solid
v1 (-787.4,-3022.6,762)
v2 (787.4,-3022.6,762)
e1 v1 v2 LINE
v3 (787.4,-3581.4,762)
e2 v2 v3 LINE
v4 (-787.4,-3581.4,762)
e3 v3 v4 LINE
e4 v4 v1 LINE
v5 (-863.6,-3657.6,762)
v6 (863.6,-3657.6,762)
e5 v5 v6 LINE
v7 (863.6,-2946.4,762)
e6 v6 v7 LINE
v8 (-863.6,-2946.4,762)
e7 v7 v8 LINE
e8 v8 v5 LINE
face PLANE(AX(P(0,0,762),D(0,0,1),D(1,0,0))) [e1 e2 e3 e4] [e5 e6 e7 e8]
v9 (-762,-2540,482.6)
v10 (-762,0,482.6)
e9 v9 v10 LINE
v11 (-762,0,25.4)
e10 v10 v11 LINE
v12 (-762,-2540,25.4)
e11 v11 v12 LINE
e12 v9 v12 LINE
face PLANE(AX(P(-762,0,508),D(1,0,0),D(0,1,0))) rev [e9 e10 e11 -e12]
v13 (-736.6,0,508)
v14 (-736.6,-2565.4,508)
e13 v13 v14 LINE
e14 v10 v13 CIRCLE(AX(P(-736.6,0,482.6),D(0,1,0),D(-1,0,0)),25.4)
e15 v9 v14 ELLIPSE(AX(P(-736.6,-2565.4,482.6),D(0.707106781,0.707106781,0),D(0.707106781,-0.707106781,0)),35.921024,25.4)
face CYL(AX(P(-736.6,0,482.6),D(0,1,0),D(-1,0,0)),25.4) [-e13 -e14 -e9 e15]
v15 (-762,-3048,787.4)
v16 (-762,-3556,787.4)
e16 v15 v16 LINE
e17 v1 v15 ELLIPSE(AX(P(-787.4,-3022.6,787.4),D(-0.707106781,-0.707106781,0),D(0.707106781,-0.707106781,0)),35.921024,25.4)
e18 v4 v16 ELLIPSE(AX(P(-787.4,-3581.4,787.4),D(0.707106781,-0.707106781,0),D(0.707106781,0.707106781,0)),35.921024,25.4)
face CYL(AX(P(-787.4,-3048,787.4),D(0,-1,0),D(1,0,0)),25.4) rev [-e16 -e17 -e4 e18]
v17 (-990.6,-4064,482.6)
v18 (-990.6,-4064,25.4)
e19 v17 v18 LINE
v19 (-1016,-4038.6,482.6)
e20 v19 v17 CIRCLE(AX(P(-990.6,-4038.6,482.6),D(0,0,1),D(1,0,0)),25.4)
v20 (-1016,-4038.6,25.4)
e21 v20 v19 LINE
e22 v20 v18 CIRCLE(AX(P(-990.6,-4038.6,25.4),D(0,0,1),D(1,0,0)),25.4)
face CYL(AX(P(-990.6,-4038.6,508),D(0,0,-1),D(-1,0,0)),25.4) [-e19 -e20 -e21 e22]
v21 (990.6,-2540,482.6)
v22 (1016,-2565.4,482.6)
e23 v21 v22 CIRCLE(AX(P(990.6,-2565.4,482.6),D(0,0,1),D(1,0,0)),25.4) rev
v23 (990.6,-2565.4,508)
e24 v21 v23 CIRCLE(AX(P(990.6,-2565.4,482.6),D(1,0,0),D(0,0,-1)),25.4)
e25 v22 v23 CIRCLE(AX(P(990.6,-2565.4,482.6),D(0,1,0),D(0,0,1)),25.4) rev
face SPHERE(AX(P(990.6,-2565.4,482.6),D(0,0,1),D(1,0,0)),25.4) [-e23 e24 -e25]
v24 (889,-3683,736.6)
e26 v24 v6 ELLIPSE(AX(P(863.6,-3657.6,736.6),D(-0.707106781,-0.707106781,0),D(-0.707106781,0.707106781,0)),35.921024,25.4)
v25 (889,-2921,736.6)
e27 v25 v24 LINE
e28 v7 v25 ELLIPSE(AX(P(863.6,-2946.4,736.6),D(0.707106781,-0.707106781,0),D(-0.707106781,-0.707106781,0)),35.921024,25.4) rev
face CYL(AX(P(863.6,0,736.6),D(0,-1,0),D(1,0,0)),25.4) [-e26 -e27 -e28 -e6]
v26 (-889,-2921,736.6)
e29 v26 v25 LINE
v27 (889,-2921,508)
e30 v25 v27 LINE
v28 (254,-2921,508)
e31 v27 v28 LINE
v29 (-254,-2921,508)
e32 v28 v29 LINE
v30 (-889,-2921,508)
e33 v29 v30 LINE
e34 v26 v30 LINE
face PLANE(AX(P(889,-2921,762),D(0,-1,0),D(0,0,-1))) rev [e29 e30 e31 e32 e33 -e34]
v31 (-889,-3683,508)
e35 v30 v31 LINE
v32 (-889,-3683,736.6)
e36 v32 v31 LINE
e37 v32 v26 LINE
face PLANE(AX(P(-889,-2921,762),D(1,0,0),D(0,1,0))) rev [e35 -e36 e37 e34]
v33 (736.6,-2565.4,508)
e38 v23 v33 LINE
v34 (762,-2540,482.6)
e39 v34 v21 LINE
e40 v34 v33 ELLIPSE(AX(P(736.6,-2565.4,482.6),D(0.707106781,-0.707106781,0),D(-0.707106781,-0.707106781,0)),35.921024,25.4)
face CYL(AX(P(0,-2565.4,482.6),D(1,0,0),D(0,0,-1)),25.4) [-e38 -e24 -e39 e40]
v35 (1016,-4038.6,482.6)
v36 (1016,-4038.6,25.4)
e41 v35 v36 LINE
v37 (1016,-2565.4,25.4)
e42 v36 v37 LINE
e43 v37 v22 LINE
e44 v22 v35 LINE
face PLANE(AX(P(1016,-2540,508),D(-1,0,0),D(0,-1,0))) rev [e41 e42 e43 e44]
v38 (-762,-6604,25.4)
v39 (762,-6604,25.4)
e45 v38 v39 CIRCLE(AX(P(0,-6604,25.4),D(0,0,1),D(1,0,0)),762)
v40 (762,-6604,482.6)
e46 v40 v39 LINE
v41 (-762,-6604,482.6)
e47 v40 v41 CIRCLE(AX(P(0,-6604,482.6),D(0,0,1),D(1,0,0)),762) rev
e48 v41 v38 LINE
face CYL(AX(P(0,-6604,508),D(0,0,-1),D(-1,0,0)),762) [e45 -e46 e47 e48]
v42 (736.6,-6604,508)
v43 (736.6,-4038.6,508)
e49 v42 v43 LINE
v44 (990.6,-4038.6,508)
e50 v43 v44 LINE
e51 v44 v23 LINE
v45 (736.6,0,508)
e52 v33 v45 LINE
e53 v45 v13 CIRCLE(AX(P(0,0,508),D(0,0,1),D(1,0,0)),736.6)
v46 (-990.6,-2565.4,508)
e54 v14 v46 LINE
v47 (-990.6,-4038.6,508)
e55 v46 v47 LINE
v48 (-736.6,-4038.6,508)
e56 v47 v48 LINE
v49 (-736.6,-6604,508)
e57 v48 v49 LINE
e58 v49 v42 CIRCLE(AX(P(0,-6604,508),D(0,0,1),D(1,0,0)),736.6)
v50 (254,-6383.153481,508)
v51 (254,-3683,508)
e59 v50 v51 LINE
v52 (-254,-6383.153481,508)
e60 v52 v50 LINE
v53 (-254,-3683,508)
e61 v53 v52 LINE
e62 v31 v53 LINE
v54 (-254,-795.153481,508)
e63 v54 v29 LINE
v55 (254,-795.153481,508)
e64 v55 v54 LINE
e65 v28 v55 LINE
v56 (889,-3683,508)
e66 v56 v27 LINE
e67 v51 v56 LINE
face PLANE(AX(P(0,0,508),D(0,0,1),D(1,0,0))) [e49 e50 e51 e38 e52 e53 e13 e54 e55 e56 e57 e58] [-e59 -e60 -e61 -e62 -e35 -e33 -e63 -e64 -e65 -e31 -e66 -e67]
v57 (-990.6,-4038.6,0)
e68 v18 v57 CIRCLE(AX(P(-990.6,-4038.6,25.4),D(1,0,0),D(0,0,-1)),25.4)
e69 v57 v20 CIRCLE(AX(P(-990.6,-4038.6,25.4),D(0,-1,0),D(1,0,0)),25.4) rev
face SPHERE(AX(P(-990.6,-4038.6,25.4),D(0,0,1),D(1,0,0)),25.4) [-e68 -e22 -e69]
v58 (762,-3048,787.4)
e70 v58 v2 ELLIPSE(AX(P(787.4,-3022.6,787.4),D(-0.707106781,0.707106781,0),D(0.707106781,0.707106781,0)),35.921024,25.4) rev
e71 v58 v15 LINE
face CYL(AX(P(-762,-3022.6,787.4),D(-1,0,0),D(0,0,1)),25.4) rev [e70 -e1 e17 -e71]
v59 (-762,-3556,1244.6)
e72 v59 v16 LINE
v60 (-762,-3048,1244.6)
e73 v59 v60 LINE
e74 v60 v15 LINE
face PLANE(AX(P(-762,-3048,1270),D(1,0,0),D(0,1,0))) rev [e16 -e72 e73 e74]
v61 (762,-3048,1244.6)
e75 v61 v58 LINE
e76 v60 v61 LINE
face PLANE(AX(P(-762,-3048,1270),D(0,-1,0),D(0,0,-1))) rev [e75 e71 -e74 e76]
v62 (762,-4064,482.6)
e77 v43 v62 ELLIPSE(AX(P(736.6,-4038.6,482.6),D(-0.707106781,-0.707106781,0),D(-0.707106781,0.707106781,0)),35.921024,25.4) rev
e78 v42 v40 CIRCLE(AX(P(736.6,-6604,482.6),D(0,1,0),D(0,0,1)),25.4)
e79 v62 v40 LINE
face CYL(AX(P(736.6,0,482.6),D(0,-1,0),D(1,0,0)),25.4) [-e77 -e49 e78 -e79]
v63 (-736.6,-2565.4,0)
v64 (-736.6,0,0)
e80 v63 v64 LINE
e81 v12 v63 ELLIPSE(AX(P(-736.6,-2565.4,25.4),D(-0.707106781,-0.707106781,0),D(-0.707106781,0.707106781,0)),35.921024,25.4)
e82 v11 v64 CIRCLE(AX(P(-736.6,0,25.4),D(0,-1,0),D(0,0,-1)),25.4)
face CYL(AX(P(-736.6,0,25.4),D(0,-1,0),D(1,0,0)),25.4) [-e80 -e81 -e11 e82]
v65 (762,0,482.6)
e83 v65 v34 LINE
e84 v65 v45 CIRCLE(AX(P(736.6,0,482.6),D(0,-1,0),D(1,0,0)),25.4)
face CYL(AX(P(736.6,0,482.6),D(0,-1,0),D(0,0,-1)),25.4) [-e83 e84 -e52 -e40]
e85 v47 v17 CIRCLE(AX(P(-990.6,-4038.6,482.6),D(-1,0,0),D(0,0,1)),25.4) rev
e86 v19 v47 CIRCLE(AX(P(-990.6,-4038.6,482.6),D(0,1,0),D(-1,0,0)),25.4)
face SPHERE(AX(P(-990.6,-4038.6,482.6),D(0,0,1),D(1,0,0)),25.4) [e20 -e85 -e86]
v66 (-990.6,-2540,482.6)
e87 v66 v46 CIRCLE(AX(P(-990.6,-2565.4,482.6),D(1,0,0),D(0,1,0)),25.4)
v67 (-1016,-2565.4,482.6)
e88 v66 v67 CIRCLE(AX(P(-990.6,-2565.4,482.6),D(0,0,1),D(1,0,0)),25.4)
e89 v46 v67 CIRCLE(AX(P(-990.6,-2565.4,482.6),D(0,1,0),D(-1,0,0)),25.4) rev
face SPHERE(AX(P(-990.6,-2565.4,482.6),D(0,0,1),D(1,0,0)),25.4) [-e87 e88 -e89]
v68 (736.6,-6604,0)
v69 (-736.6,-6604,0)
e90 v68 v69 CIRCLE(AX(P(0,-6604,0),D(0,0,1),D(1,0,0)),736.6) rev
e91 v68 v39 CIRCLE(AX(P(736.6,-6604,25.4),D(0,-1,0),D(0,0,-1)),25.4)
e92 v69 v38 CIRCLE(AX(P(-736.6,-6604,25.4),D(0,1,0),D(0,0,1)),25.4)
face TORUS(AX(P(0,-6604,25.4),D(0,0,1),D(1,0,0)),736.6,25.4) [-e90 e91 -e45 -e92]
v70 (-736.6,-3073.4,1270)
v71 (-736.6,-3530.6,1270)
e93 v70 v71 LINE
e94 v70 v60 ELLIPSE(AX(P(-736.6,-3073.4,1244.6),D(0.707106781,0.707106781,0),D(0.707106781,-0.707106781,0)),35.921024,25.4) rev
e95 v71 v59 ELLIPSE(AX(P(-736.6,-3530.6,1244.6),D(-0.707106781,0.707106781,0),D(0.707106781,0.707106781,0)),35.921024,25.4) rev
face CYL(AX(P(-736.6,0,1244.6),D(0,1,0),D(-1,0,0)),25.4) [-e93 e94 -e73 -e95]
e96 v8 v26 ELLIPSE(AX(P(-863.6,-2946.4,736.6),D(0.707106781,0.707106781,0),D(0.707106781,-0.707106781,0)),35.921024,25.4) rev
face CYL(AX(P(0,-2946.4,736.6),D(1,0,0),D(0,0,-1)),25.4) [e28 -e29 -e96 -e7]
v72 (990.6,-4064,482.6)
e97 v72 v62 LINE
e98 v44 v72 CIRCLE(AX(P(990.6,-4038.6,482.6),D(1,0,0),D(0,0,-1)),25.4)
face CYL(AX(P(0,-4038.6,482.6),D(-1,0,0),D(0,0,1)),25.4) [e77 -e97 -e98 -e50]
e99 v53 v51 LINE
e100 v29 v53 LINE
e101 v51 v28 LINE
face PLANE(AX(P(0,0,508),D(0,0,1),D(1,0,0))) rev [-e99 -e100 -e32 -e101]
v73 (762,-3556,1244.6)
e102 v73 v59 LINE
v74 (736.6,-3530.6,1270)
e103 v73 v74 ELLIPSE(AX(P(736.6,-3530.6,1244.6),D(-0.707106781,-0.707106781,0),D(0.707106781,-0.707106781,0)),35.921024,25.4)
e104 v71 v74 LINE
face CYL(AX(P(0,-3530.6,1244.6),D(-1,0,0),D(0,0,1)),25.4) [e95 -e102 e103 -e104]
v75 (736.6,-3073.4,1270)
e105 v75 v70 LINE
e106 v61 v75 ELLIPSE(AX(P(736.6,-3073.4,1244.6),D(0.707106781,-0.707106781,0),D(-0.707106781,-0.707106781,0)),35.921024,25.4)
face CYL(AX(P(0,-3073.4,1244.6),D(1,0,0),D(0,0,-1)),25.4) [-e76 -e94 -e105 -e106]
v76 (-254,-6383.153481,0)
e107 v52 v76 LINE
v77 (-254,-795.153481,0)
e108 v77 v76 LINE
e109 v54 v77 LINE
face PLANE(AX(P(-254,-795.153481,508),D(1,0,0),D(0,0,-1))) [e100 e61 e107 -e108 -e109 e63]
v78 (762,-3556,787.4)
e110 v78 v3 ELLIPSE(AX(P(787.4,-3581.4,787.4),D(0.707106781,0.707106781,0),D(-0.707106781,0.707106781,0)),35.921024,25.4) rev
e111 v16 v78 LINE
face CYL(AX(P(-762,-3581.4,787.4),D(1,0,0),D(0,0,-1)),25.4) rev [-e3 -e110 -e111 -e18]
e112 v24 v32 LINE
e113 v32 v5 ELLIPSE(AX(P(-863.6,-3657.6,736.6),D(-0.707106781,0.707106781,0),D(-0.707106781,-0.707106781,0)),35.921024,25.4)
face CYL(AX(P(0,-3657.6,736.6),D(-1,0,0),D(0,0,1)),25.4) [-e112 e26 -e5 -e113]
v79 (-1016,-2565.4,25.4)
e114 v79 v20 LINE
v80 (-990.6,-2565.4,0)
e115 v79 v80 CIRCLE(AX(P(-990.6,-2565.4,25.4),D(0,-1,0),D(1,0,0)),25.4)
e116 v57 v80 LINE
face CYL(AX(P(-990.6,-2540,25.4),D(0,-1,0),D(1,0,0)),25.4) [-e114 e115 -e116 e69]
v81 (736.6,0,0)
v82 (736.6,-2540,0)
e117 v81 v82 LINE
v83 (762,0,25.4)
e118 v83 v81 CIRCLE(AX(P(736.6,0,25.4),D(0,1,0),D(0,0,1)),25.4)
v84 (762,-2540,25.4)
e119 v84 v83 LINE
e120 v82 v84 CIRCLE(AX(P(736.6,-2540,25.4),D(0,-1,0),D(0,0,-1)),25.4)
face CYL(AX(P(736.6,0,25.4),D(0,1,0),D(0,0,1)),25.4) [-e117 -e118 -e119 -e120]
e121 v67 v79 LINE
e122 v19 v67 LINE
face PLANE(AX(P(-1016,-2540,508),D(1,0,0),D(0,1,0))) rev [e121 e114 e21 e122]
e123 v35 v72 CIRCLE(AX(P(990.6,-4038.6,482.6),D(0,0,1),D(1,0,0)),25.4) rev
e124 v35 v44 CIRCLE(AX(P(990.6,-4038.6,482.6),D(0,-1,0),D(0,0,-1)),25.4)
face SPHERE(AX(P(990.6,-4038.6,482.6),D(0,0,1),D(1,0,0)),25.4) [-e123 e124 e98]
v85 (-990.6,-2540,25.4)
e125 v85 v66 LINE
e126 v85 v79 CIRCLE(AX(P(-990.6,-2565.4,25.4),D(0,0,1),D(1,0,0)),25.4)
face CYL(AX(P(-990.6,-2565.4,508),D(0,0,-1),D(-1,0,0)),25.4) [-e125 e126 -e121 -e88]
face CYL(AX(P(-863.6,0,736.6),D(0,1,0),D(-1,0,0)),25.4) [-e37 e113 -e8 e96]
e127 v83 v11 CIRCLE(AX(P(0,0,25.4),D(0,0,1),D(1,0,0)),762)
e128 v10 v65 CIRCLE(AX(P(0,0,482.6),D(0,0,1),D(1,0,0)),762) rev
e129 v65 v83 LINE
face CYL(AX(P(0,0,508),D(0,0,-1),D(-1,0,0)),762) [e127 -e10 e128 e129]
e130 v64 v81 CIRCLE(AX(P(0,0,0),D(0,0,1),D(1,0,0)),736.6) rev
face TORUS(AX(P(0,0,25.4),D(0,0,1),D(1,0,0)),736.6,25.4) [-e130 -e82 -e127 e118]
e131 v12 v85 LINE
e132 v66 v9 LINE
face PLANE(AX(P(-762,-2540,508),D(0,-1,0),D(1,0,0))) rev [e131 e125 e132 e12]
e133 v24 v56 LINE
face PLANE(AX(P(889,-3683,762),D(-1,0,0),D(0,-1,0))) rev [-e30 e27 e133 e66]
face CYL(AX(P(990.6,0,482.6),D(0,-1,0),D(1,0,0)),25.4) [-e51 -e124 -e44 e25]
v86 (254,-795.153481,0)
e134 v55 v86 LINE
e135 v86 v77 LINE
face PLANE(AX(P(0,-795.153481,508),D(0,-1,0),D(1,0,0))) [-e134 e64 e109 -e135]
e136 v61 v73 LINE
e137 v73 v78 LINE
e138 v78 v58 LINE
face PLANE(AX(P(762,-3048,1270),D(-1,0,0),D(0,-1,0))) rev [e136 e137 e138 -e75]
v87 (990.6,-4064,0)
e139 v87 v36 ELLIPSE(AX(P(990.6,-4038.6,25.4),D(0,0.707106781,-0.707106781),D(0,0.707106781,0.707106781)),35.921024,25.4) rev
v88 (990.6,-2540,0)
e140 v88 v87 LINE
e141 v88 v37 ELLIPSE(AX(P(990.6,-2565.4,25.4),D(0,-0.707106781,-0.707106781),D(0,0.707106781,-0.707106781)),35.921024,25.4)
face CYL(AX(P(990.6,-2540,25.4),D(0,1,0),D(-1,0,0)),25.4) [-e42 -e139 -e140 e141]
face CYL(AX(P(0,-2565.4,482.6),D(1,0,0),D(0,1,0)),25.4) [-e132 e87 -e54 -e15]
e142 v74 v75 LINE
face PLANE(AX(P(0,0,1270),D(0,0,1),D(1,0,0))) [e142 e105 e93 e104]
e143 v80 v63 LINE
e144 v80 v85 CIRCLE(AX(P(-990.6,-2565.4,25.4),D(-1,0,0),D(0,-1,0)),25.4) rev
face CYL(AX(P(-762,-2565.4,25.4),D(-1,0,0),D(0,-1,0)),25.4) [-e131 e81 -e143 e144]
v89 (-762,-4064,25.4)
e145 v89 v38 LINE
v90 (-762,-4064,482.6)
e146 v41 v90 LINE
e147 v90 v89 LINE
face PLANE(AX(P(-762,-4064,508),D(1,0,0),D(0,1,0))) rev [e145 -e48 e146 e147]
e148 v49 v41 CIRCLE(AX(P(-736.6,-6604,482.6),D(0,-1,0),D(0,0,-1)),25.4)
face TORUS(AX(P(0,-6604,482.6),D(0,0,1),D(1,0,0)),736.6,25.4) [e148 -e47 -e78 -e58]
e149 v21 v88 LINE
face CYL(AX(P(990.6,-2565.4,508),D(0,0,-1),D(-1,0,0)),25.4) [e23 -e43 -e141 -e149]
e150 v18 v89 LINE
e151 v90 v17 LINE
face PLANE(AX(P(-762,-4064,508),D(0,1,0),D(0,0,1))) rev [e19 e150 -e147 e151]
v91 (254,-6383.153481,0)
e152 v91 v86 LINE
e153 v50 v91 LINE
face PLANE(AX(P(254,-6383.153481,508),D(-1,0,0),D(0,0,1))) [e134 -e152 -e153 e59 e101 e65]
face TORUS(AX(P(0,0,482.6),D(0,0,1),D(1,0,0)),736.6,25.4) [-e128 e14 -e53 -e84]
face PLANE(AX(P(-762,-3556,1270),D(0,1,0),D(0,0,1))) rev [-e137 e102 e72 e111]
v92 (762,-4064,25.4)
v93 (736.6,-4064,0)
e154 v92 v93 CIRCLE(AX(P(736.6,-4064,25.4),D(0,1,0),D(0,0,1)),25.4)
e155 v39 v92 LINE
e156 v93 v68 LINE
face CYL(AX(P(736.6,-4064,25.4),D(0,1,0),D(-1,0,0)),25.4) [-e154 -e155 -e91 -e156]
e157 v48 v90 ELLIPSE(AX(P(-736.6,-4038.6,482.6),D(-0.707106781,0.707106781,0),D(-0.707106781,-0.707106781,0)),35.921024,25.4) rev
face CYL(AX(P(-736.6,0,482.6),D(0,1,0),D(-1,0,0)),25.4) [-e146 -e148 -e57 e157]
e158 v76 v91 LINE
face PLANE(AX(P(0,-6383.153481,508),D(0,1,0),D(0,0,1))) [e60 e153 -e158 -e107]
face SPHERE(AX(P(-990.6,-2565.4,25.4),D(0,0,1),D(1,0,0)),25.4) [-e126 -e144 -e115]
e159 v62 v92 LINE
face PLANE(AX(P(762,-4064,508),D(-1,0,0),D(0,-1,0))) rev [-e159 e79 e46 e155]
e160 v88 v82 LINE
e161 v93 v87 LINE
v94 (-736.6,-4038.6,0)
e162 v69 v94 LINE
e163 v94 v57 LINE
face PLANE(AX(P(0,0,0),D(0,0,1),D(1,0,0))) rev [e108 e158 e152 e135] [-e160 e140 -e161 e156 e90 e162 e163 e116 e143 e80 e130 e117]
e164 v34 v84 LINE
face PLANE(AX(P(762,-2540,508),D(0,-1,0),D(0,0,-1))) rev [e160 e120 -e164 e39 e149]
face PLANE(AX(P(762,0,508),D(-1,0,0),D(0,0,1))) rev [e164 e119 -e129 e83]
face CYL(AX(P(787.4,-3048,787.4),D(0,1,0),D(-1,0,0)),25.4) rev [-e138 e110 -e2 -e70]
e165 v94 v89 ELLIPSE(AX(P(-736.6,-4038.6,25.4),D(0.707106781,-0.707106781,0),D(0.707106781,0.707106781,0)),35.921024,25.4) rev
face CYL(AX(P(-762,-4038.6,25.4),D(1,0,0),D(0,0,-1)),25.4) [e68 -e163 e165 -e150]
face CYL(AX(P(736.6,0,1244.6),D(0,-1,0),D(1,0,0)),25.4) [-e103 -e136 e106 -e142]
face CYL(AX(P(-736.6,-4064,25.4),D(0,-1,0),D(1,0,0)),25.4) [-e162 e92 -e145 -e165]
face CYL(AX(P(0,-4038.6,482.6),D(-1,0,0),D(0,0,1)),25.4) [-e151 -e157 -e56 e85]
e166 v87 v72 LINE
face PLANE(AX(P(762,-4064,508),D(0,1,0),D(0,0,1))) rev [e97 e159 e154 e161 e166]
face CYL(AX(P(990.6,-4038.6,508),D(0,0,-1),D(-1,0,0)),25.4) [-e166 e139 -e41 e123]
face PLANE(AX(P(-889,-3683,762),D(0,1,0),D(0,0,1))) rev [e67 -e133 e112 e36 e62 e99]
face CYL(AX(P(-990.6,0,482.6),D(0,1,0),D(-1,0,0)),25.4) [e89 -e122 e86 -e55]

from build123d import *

# Parameters (mm, degrees)
BOSS_EXTRUDE1_DEPTH = 508
SKETCH2_W           = 1524
SKETCH2_H           = 508
BOSS_EXTRUDE3_DEPTH = 762
SKETCH3_W           = 1778
SKETCH3_H           = 762
SKETCH3_W_2         = 1524
SKETCH3_H_2         = 508
BOSS_EXTRUDE4_DEPTH = 254
FILLET1_R           = 25.4
FILLET2_R           = 25.4
FILLET3_R           = 25.4


with BuildPart() as part:
    # Sketch1 → Boss-Extrude1 (new body)
    with BuildSketch(Plane.XY):
        with BuildLine():
            Line((762, 0), (762, -2540))
            Line((762, -2540), (1016, -2540))
            Line((1016, -2540), (1016, -4064))
            Line((1016, -4064), (762, -4064))
            Line((762, -4064), (762, -6604))
            ThreePointArc((762, -6604), (0, -7366), (-762, -6604))
            Line((-762, -6604), (-762, -4064))
            Line((-762, -4064), (-1016, -4064))
            Line((-1016, -4064), (-1016, -2540))
            Line((-1016, -2540), (-762, -2540))
            Line((-762, -2540), (-762, 0))
            ThreePointArc((-762, 0), (0, 762), (762, 0))
        make_face()
        Polygon((0, -795.153480501), (-254, -795.153480501), (-254, -6383.153480501), (0, -6383.153480501), (254, -6383.153480501), (254, -795.153480501), align=None, mode=Mode.SUBTRACT)
    extrude(amount=BOSS_EXTRUDE1_DEPTH)

    # Sketch2 → Boss-Extrude3 (add)
    with BuildSketch(Plane.XY.offset(508)):
        with Locations((0, -3302)):
            Rectangle(SKETCH2_W, SKETCH2_H)
    extrude(amount=BOSS_EXTRUDE3_DEPTH)

    # Sketch3 → Boss-Extrude4 (add)
    with BuildSketch(Plane.XY.offset(508)):
        with Locations((0, -3302)):
            Rectangle(SKETCH3_W, SKETCH3_H)
        with Locations((0, -3302)):
            Rectangle(SKETCH3_W_2, SKETCH3_H_2, mode=Mode.SUBTRACT)
    extrude(amount=BOSS_EXTRUDE4_DEPTH)

    # Fillet1
    fillet1_edges = [part.edges().sort_by_distance(p)[0] for p in [
        (762, -3302, 1270),
        (0, -3048, 1270),
        (-762, -3302, 1270),
        (0, -3556, 1270),
        (0, -3683, 762),
        (889, -3302, 762),
        (0, -2921, 762),
        (-889, -3302, 762),
        (0, -3556, 762),
        (762, -3302, 762),
        (0, -3048, 762),
        (-762, -3302, 762),
    ]]
    fillet(fillet1_edges, radius=FILLET1_R)

    # Fillet2
    fillet2_edges = [part.edges().sort_by_distance(p)[0] for p in [
        (1016, -4064, 254),
        (-889, -2540, 0),
        (-889, -2540, 508),
        (0, -7366, 508),
        (0, -7366, 0),
        (-762, -1270, 508),
        (-762, -1270, 0),
        (0, 762, 508),
        (0, 762, 0),
        (762, -1270, 0),
        (-889, -4064, 0),
        (-889, -4064, 508),
        (-1016, -3302, 508),
        (-1016, -3302, 0),
        (-762, -5334, 0),
        (-762, -5334, 508),
        (762, -5334, 0),
        (1016, -3302, 0),
        (1016, -2540, 254),
        (762, -1270, 508),
        (889, -2540, 508),
        (889, -4064, 508),
        (762, -5334, 508),
        (1016, -3302, 508),
    ]]
    fillet(fillet2_edges, radius=FILLET2_R)

    # Fillet3
    # the kernel refuses this fillet: 25.4 mm, written as the material it takes off along each edge
    with BuildSketch(Plane(origin=(-990.6, -2565.4, 482.6), x_dir=(-1, 0, 0), z_dir=(0, 1, 0))) as fillet3_piece_1_section:
        Polygon((0, 0), (FILLET3_R * 1.02, 0), (FILLET3_R * 1.02, FILLET3_R * 1.02), (0, FILLET3_R * 1.02), align=None)
    fillet3_piece_1 = extrude(amount=FILLET3_R * 1.02, mode=Mode.PRIVATE)
    fillet3_piece_1 = fillet3_piece_1 - Plane(origin=(-990.6, -2565.4, 482.6), x_dir=(0.7071067811865475, 0, -0.7071067811865475), z_dir=(0, 1, 0)) * Sphere(FILLET3_R, mode=Mode.PRIVATE)
    with BuildSketch(Plane(origin=(-990.6, -4038.6, 482.6), x_dir=(0, -1, 0), z_dir=(-1, 0, 0))) as fillet3_piece_2_section:
        Polygon((0, 0), (FILLET3_R * 1.02, 0), (FILLET3_R * 1.02, FILLET3_R * 1.02), (0, FILLET3_R * 1.02), align=None)
    fillet3_piece_2 = extrude(amount=FILLET3_R * 1.02, mode=Mode.PRIVATE)
    fillet3_piece_2 = fillet3_piece_2 - Plane(origin=(-990.6, -4038.6, 482.6), x_dir=(0, 0.7071067811865475, -0.7071067811865475), z_dir=(-1, 0, 0)) * Sphere(FILLET3_R, mode=Mode.PRIVATE)
    with BuildSketch(Plane(origin=(-990.6, -4038.6, 25.4), x_dir=(0, -1, 0), z_dir=(-1, 0, 0))) as fillet3_piece_3_section:
        Polygon((0, 0), (FILLET3_R * 1.02, 0), (FILLET3_R * 1.02, -FILLET3_R * 1.02), (0, -FILLET3_R * 1.02), align=None)
    fillet3_piece_3 = extrude(amount=FILLET3_R * 1.02, mode=Mode.PRIVATE)
    fillet3_piece_3 = fillet3_piece_3 - Plane(origin=(-990.6, -4038.6, 25.4), x_dir=(0, 0.7071067811865475, 0.7071067811865475), z_dir=(-1, 0, 0)) * Sphere(FILLET3_R, mode=Mode.PRIVATE)
    with BuildSketch(Plane(origin=(-990.6, -2565.4, 25.4), x_dir=(-1, 0, 0), z_dir=(0, 1, 0))) as fillet3_piece_4_section:
        Polygon((0, 0), (FILLET3_R * 1.02, 0), (FILLET3_R * 1.02, -FILLET3_R * 1.02), (0, -FILLET3_R * 1.02), align=None)
    fillet3_piece_4 = extrude(amount=FILLET3_R * 1.02, mode=Mode.PRIVATE)
    fillet3_piece_4 = fillet3_piece_4 - Plane(origin=(-990.6, -2565.4, 25.4), x_dir=(0.7071067811865475, 0, 0.7071067811865475), z_dir=(0, 1, 0)) * Sphere(FILLET3_R, mode=Mode.PRIVATE)
    with BuildSketch(Plane(origin=(-1016, -2540, 25.4), x_dir=(1, 0, 0), z_dir=(0, 0, 1)), Plane(origin=(-1016, -4064, 25.4), x_dir=(0, 1, 0), z_dir=(0, 0, 1))) as fillet3_piece_5:
        with BuildLine():
            CenterArc((FILLET3_R, -FILLET3_R), FILLET3_R, 90, 90)
            Line((0, -FILLET3_R), (0, 0))
            Line((0, 0), (FILLET3_R, 0))
        make_face()
    fillet3_piece_5_solid = extrude(amount=457.2, mode=Mode.PRIVATE)
    add([fillet3_piece_1, fillet3_piece_2, fillet3_piece_3, fillet3_piece_4, fillet3_piece_5_solid], mode=Mode.SUBTRACT)


solid = part.part
